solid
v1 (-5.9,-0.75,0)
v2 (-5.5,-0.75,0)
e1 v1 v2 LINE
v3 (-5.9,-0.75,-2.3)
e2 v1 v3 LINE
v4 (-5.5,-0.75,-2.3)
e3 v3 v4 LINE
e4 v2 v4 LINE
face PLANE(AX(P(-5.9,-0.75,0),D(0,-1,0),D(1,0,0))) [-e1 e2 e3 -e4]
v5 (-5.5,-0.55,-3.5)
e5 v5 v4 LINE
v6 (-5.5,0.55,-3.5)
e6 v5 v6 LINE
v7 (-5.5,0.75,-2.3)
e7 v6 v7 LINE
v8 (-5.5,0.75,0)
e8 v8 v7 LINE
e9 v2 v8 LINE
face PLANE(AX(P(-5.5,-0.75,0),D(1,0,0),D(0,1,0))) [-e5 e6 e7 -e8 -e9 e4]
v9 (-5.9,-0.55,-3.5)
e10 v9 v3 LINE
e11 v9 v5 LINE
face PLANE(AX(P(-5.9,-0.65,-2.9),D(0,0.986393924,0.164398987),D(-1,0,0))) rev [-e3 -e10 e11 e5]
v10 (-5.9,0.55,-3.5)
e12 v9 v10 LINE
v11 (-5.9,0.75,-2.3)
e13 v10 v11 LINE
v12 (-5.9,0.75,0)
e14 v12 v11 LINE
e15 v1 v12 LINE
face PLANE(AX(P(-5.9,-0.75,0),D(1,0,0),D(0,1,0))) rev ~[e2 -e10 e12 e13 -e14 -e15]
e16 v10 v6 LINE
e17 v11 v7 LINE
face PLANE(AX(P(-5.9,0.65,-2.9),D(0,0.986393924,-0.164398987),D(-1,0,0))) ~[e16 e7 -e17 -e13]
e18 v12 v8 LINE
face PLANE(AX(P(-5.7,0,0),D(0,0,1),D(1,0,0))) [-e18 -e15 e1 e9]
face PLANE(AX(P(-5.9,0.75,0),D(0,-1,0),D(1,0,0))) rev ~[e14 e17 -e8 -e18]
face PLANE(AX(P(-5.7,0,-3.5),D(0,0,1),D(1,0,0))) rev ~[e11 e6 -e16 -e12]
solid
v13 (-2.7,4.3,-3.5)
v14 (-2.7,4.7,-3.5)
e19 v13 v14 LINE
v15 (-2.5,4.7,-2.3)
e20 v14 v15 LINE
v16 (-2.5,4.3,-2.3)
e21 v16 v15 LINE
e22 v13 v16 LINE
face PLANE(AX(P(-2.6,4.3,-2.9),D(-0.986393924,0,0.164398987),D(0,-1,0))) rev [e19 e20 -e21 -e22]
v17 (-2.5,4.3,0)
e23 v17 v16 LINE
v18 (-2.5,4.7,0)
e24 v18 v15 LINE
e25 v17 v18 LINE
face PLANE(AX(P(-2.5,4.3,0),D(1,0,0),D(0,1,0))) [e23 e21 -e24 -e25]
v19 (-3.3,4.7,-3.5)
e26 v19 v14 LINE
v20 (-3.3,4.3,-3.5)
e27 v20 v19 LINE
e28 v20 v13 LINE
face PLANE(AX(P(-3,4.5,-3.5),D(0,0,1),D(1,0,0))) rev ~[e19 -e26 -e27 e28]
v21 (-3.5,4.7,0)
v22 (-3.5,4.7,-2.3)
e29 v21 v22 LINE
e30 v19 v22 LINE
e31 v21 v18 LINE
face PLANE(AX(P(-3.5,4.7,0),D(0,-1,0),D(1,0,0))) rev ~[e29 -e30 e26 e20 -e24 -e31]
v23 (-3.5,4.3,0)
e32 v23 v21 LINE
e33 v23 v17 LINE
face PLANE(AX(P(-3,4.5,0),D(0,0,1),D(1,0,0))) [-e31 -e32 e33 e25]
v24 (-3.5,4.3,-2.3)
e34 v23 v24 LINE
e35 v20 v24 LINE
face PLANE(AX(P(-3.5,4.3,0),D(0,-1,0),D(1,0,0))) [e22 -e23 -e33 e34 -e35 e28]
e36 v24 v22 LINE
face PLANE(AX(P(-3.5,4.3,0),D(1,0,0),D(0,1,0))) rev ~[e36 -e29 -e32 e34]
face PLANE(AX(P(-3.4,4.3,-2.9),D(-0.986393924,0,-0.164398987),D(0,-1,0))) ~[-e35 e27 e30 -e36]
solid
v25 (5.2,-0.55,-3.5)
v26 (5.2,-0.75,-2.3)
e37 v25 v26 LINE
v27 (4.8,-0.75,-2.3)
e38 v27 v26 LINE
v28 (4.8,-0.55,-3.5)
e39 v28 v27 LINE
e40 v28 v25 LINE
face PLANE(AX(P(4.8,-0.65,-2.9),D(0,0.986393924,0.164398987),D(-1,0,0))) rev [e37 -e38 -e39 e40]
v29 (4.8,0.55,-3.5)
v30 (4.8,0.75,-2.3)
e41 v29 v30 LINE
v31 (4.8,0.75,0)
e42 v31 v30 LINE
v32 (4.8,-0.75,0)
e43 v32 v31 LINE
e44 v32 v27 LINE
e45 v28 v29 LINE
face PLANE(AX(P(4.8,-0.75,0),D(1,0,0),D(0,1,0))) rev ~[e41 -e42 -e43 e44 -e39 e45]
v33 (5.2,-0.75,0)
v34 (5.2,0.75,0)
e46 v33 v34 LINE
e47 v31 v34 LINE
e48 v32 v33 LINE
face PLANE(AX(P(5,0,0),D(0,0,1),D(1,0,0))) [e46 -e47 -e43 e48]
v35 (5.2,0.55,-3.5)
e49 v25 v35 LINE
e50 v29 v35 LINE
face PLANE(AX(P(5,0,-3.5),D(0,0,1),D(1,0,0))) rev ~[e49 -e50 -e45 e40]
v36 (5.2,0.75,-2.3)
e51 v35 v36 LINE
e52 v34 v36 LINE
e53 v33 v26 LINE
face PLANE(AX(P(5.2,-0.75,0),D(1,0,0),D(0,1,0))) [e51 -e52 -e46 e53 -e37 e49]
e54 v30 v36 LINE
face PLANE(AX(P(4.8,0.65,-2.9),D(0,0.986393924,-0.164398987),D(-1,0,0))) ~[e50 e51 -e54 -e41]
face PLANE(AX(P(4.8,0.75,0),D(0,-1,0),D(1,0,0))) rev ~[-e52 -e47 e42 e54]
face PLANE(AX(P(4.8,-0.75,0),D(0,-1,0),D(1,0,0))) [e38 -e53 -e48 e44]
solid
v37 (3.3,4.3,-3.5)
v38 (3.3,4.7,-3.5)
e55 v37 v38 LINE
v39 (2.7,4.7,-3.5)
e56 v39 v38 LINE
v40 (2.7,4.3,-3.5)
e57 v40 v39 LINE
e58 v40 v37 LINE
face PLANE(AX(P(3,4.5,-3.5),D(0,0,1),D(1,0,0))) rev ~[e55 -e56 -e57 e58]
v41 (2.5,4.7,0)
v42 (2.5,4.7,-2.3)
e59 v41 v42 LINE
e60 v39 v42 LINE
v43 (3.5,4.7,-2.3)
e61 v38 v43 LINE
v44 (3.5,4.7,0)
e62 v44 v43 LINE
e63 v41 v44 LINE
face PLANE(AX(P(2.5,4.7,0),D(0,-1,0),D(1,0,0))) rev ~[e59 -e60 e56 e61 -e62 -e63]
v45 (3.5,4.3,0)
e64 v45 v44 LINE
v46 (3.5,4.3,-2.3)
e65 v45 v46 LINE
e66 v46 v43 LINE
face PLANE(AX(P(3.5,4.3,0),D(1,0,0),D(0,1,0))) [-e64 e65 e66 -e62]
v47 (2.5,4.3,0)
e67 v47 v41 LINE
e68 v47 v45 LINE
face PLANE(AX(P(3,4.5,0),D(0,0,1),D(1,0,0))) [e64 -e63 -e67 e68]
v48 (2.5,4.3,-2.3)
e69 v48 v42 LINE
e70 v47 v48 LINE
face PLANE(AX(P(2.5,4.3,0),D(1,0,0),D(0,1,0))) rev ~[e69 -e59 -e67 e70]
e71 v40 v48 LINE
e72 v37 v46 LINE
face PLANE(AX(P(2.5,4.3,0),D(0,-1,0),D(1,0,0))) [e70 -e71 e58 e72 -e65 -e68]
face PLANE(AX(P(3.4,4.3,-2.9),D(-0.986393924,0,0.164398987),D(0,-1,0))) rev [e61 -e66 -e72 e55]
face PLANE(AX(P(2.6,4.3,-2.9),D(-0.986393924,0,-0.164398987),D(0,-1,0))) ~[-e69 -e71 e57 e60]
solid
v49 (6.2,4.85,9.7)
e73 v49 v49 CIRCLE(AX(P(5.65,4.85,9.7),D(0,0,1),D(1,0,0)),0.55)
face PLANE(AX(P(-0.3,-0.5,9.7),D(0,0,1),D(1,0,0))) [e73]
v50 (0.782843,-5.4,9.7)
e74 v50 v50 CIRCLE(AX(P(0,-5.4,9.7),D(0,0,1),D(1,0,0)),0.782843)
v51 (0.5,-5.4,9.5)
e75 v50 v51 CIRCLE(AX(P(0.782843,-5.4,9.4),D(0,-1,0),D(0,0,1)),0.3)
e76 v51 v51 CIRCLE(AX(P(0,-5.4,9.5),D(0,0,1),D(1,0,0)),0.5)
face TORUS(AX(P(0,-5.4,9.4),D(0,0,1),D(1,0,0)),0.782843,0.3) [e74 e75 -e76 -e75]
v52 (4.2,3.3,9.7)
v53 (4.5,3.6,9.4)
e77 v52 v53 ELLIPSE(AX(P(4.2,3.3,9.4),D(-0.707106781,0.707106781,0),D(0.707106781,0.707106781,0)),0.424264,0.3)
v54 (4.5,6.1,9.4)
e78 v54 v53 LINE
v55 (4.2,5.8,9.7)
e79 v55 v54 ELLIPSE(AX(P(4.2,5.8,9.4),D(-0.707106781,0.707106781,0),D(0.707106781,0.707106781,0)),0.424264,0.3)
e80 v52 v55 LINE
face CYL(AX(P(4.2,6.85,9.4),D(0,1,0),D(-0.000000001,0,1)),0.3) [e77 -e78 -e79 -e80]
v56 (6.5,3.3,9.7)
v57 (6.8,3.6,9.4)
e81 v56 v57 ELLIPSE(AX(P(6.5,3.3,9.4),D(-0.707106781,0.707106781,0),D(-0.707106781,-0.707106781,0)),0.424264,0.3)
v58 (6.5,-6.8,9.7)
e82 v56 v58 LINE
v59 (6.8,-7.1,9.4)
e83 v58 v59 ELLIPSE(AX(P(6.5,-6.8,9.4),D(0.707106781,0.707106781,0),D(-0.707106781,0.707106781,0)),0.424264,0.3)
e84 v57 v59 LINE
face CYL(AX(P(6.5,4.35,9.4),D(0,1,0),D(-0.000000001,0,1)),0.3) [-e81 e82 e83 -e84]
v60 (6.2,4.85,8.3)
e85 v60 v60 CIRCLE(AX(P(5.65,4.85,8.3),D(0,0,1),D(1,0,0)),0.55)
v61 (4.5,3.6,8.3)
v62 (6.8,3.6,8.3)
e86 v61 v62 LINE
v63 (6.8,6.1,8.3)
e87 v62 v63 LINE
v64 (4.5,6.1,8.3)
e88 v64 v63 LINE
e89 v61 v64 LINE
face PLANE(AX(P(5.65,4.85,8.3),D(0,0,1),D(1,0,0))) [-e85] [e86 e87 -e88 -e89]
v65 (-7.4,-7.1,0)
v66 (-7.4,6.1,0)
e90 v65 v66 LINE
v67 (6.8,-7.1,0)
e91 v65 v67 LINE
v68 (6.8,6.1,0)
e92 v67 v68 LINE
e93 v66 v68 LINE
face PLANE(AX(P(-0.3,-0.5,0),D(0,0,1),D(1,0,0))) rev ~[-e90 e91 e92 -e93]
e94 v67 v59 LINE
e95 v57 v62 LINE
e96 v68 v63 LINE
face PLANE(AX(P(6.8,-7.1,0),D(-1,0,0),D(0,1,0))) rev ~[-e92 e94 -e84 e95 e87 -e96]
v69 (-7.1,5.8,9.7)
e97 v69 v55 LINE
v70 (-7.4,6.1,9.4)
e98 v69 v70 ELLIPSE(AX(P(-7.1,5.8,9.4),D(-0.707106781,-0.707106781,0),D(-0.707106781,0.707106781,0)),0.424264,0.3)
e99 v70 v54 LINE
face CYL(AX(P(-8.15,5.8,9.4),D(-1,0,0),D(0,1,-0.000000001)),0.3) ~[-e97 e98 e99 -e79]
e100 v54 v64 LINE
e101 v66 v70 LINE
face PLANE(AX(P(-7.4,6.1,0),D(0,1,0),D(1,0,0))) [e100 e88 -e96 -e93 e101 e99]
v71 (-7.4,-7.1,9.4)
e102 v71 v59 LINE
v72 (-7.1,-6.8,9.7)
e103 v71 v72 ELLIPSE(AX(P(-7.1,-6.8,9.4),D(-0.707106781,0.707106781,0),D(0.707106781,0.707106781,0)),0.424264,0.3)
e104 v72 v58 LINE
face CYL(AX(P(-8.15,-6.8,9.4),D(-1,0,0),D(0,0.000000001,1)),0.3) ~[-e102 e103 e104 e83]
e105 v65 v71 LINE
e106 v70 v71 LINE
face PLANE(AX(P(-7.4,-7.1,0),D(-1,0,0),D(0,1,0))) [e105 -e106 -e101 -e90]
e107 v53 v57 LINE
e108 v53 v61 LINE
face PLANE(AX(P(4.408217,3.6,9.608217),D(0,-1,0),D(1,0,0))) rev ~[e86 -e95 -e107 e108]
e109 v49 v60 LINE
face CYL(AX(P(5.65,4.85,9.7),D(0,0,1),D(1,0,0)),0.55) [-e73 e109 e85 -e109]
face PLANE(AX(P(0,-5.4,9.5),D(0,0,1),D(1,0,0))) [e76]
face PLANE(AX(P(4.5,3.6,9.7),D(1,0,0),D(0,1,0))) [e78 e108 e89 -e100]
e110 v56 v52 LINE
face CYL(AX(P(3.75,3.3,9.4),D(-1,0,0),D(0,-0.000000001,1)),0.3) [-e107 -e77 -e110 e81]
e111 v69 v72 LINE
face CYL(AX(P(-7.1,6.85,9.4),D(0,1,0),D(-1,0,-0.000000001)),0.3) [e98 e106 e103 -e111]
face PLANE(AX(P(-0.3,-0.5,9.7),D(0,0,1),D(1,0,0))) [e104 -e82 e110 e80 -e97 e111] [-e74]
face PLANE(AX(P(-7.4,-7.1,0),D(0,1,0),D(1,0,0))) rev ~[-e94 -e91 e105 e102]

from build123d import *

# Parameters (mm, degrees)
F1_W         = 14.2
F1_H         = 13.2
F2_DEPTH     = 9.7
F0_W         = 0.4
F0_H         = 1.5
F3_DEPTH     = 3.5
F0_W_2       = 1.5
F0_H_2       = 0.4
F0_W_3       = 1
F4_W         = 2.3
F4_H         = 2.5
F4_R         = 0.55
F5_DEPTH     = 1.4
F4_R_2       = 0.5
F6_DEPTH     = 0.2
F7_T1_DEPTH  = 3.25
F7_T3_DEPTH  = 13.4
F7_T5_DEPTH  = 3.05
F7_T7_DEPTH  = 14.7
F7_T9_DEPTH  = 12.2
F7_T11_DEPTH = 15.7
F7_T19_DEPTH = 3.25
F7_T23_DEPTH = 3.05
F8_SIZE2     = 1.2
F8_SIZE      = 0.2
F8_2_SIZE2   = 1.2
F8_2_SIZE    = 0.2
F8_3_SIZE2   = 1.2
F8_3_SIZE    = 0.2
F8_4_SIZE2   = 1.2
F8_4_SIZE    = 0.2
F8_5_SIZE2   = 1.2
F8_5_SIZE    = 0.2


# Not quite as in the source:
# - a fillet or chamfer that OpenCascade refuses, or shapes differently, is made with other operations: its cross-section is extruded or revolved along the edge and cut away or added


with BuildPart() as f2:
    # F1 (on Top) → F2 (new body)
    with BuildSketch(Plane.XY):
        with Locations((-0.3, -0.5)):
            Rectangle(F1_W, F1_H)
    extrude(amount=F2_DEPTH)

    # F4 (on face) → F5 (cut)
    with BuildSketch(Plane.XY.offset(9.7)):
        with Locations((5.65, 4.85)):
            Rectangle(F4_W, F4_H)
        with Locations((5.65, 4.85)):
            Circle(F4_R, mode=Mode.SUBTRACT)
    extrude(amount=-F5_DEPTH, mode=Mode.SUBTRACT)

    # F4 (on face) → F6 (cut)
    with BuildSketch(Plane.XY.offset(9.7)):
        with Locations((0, -5.4)):
            Circle(F4_R_2)
    extrude(amount=-F6_DEPTH, mode=Mode.SUBTRACT)

    # F7: fillet of radius 0.3 on 7 edges, made by hand

    # F7_s2 → F7_t1 (cut)
    with BuildSketch(Plane.XZ.offset(-6.85)):
        with BuildLine():
            ThreePointArc((4.2, 9.7), (4.4121320344, 9.6121320344), (4.5, 9.4))
            Line((4.5, 9.4), (4.5, 9.7))
            Line((4.5, 9.7), (4.2, 9.7))
        make_face()
    extrude(amount=F7_T1_DEPTH, mode=Mode.SUBTRACT)

    # F7_s4 → F7_t3 (cut)
    with BuildSketch(Plane.YZ.offset(-8.15)):
        with BuildLine():
            ThreePointArc((6.1, 9.4), (6.0121320344, 9.6121320344), (5.8, 9.7))
            Line((5.8, 9.7), (6.1, 9.7))
            Line((6.1, 9.7), (6.1, 9.4))
        make_face()
    extrude(amount=F7_T3_DEPTH, mode=Mode.SUBTRACT)

    # F7_s6 → F7_t5 (cut)
    with BuildSketch(Plane.YZ.offset(4.5)):
        with BuildLine():
            ThreePointArc((3.3, 9.7), (3.5121320344, 9.6121320344), (3.6, 9.4))
            Line((3.6, 9.4), (3.6, 9.7))
            Line((3.6, 9.7), (3.3, 9.7))
        make_face()
    extrude(amount=F7_T5_DEPTH, mode=Mode.SUBTRACT)

    # F7_s8 → F7_t7 (cut)
    with BuildSketch(Plane.XZ.offset(-6.85)):
        with BuildLine():
            ThreePointArc((-7.4, 9.4), (-7.3121320344, 9.6121320344), (-7.1, 9.7))
            Line((-7.1, 9.7), (-7.4, 9.7))
            Line((-7.4, 9.7), (-7.4, 9.4))
        make_face()
    extrude(amount=F7_T7_DEPTH, mode=Mode.SUBTRACT)

    # F7_s10 → F7_t9 (cut)
    with BuildSketch(Plane.XZ.offset(-4.35)):
        with BuildLine():
            ThreePointArc((6.5, 9.7), (6.7121320344, 9.6121320344), (6.8, 9.4))
            Line((6.8, 9.4), (6.8, 9.7))
            Line((6.8, 9.7), (6.5, 9.7))
        make_face()
    extrude(amount=F7_T9_DEPTH, mode=Mode.SUBTRACT)

    # F7_s12 → F7_t11 (cut)
    with BuildSketch(Plane.YZ.offset(-8.15)):
        with BuildLine():
            ThreePointArc((-6.8, 9.7), (-7.0121320344, 9.6121320344), (-7.1, 9.4))
            Line((-7.1, 9.4), (-7.1, 9.7))
            Line((-7.1, 9.7), (-6.8, 9.7))
        make_face()
    extrude(amount=F7_T11_DEPTH, mode=Mode.SUBTRACT)

    # F7_s13 → F7_t14 (revolve, cut)
    with BuildSketch(Plane.XZ.offset(5.4)):
        with BuildLine():
            ThreePointArc((0.7828427125, 9.7), (0.6096376317, 9.6449489743), (0.5, 9.5))
            Line((0.5, 9.5), (0.5, 9.7))
            Line((0.5, 9.7), (0.7828427125, 9.7))
        make_face()
    revolve(axis=Axis((0, -5.4, 9.7), (0, 0, 1)), mode=Mode.SUBTRACT)


with BuildPart() as f3:
    # F0 (on Top) → F3 (new body)
    with BuildSketch(Plane.XY):
        with Locations((-5.7, 0)):
            Rectangle(F0_W, F0_H)
    extrude(amount=-F3_DEPTH)

    # F8
    f8_edges = [f3.edges().sort_by_distance(p)[0] for p in [
        (-5.7, -0.75, -3.5),
        (-5.7, 0.75, -3.5),
    ]]
    f8_side = f3.faces().sort_by_distance((-5.7, 0, -3.5))[0]
    chamfer(f8_edges, length=F8_SIZE, length2=F8_SIZE2, reference=f8_side)


with BuildPart() as f3b:
    # F0 (on Top) → F3, piece 2 (new body)
    with BuildSketch(Plane.XY):
        with Locations((5, 0)):
            Rectangle(F0_W, F0_H)
    extrude(amount=-F3_DEPTH)

    # F8#5
    f8_5_edges = [f3b.edges().sort_by_distance(p)[0] for p in [
        (5, -0.75, -3.5),
        (5, 0.75, -3.5),
    ]]
    f8_5_side = f3b.faces().sort_by_distance((5, 0, -3.5))[0]
    chamfer(f8_5_edges, length=F8_5_SIZE, length2=F8_5_SIZE2, reference=f8_5_side)


with BuildPart() as f3c:
    # F0 (on Top) → F3, piece 3 (new body)
    with BuildSketch(Plane.XY):
        with Locations((0, -5.4)):
            Rectangle(F0_W_2, F0_H_2)
    extrude(amount=-F3_DEPTH)

    # F8#2
    f8_2_edges = [f3c.edges().sort_by_distance(p)[0] for p in [
        (0.75, -5.4, -3.5),
        (-0.75, -5.4, -3.5),
    ]]
    f8_2_side = f3c.faces().sort_by_distance((0, -5.4, -3.5))[0]
    chamfer(f8_2_edges, length=F8_2_SIZE, length2=F8_2_SIZE2, reference=f8_2_side)


with BuildPart() as f3d:
    # F0 (on Top) → F3, piece 4 (new body)
    with BuildSketch(Plane.XY):
        with Locations((-3, 4.5)):
            Rectangle(F0_W_3, F0_H_2)
    extrude(amount=-F3_DEPTH)

    # F8#3
    f8_3_edges = [f3d.edges().sort_by_distance(p)[0] for p in [
        (-2.5, 4.5, -3.5),
        (-3.5, 4.5, -3.5),
    ]]
    f8_3_side = f3d.faces().sort_by_distance((-3, 4.5, -3.5))[0]
    chamfer(f8_3_edges, length=F8_3_SIZE, length2=F8_3_SIZE2, reference=f8_3_side)


with BuildPart() as f3e:
    # F0 (on Top) → F3, piece 5 (new body)
    with BuildSketch(Plane.XY):
        with Locations((3, 4.5)):
            Rectangle(F0_W_3, F0_H_2)
    extrude(amount=-F3_DEPTH)

    # F8#4
    f8_4_edges = [f3e.edges().sort_by_distance(p)[0] for p in [
        (2.5, 4.5, -3.5),
        (3.5, 4.5, -3.5),
    ]]
    f8_4_side = f3e.faces().sort_by_distance((3, 4.5, -3.5))[0]
    chamfer(f8_4_edges, length=F8_4_SIZE, length2=F8_4_SIZE2, reference=f8_4_side)


with BuildPart() as f7_tool17:
    # F7_s18 → F7_t19 (new body)
    with BuildSketch(Plane.XZ.offset(-6.1)):
        with BuildLine():
            ThreePointArc((4.2, 9.7), (4.4121320344, 9.6121320344), (4.5, 9.4))
            Line((4.5, 9.4), (4.5, 9.7))
            Line((4.5, 9.7), (4.2, 9.7))
        make_face()
    extrude(amount=F7_T19_DEPTH)

    split(bisect_by=Plane.XZ.offset(-3.6), keep=Keep.TOP)


with BuildPart() as f7_tool21:
    # F7_s22 → F7_t23 (new body)
    with BuildSketch(Plane.YZ.offset(3.75)):
        with BuildLine():
            ThreePointArc((3.3, 9.7), (3.5121320344, 9.6121320344), (3.6, 9.4))
            Line((3.6, 9.4), (3.6, 9.7))
            Line((3.6, 9.7), (3.3, 9.7))
        make_face()
    extrude(amount=F7_T23_DEPTH)

    split(bisect_by=Plane.YZ.offset(4.5), keep=Keep.BOTTOM)


with BuildPart() as f7_tool17_1:
    add(f7_tool17.part)

    # F7_t25: intersect F7_tool21
    add(f7_tool21.part, mode=Mode.INTERSECT)


with BuildPart() as f2_1:
    add(f2.part)

    # F7_t15: cut F7_tool17
    add(f7_tool17_1.part, mode=Mode.SUBTRACT)


solid = Compound([f3.part, f3b.part, f3d.part, f3e.part, f2_1.part])
